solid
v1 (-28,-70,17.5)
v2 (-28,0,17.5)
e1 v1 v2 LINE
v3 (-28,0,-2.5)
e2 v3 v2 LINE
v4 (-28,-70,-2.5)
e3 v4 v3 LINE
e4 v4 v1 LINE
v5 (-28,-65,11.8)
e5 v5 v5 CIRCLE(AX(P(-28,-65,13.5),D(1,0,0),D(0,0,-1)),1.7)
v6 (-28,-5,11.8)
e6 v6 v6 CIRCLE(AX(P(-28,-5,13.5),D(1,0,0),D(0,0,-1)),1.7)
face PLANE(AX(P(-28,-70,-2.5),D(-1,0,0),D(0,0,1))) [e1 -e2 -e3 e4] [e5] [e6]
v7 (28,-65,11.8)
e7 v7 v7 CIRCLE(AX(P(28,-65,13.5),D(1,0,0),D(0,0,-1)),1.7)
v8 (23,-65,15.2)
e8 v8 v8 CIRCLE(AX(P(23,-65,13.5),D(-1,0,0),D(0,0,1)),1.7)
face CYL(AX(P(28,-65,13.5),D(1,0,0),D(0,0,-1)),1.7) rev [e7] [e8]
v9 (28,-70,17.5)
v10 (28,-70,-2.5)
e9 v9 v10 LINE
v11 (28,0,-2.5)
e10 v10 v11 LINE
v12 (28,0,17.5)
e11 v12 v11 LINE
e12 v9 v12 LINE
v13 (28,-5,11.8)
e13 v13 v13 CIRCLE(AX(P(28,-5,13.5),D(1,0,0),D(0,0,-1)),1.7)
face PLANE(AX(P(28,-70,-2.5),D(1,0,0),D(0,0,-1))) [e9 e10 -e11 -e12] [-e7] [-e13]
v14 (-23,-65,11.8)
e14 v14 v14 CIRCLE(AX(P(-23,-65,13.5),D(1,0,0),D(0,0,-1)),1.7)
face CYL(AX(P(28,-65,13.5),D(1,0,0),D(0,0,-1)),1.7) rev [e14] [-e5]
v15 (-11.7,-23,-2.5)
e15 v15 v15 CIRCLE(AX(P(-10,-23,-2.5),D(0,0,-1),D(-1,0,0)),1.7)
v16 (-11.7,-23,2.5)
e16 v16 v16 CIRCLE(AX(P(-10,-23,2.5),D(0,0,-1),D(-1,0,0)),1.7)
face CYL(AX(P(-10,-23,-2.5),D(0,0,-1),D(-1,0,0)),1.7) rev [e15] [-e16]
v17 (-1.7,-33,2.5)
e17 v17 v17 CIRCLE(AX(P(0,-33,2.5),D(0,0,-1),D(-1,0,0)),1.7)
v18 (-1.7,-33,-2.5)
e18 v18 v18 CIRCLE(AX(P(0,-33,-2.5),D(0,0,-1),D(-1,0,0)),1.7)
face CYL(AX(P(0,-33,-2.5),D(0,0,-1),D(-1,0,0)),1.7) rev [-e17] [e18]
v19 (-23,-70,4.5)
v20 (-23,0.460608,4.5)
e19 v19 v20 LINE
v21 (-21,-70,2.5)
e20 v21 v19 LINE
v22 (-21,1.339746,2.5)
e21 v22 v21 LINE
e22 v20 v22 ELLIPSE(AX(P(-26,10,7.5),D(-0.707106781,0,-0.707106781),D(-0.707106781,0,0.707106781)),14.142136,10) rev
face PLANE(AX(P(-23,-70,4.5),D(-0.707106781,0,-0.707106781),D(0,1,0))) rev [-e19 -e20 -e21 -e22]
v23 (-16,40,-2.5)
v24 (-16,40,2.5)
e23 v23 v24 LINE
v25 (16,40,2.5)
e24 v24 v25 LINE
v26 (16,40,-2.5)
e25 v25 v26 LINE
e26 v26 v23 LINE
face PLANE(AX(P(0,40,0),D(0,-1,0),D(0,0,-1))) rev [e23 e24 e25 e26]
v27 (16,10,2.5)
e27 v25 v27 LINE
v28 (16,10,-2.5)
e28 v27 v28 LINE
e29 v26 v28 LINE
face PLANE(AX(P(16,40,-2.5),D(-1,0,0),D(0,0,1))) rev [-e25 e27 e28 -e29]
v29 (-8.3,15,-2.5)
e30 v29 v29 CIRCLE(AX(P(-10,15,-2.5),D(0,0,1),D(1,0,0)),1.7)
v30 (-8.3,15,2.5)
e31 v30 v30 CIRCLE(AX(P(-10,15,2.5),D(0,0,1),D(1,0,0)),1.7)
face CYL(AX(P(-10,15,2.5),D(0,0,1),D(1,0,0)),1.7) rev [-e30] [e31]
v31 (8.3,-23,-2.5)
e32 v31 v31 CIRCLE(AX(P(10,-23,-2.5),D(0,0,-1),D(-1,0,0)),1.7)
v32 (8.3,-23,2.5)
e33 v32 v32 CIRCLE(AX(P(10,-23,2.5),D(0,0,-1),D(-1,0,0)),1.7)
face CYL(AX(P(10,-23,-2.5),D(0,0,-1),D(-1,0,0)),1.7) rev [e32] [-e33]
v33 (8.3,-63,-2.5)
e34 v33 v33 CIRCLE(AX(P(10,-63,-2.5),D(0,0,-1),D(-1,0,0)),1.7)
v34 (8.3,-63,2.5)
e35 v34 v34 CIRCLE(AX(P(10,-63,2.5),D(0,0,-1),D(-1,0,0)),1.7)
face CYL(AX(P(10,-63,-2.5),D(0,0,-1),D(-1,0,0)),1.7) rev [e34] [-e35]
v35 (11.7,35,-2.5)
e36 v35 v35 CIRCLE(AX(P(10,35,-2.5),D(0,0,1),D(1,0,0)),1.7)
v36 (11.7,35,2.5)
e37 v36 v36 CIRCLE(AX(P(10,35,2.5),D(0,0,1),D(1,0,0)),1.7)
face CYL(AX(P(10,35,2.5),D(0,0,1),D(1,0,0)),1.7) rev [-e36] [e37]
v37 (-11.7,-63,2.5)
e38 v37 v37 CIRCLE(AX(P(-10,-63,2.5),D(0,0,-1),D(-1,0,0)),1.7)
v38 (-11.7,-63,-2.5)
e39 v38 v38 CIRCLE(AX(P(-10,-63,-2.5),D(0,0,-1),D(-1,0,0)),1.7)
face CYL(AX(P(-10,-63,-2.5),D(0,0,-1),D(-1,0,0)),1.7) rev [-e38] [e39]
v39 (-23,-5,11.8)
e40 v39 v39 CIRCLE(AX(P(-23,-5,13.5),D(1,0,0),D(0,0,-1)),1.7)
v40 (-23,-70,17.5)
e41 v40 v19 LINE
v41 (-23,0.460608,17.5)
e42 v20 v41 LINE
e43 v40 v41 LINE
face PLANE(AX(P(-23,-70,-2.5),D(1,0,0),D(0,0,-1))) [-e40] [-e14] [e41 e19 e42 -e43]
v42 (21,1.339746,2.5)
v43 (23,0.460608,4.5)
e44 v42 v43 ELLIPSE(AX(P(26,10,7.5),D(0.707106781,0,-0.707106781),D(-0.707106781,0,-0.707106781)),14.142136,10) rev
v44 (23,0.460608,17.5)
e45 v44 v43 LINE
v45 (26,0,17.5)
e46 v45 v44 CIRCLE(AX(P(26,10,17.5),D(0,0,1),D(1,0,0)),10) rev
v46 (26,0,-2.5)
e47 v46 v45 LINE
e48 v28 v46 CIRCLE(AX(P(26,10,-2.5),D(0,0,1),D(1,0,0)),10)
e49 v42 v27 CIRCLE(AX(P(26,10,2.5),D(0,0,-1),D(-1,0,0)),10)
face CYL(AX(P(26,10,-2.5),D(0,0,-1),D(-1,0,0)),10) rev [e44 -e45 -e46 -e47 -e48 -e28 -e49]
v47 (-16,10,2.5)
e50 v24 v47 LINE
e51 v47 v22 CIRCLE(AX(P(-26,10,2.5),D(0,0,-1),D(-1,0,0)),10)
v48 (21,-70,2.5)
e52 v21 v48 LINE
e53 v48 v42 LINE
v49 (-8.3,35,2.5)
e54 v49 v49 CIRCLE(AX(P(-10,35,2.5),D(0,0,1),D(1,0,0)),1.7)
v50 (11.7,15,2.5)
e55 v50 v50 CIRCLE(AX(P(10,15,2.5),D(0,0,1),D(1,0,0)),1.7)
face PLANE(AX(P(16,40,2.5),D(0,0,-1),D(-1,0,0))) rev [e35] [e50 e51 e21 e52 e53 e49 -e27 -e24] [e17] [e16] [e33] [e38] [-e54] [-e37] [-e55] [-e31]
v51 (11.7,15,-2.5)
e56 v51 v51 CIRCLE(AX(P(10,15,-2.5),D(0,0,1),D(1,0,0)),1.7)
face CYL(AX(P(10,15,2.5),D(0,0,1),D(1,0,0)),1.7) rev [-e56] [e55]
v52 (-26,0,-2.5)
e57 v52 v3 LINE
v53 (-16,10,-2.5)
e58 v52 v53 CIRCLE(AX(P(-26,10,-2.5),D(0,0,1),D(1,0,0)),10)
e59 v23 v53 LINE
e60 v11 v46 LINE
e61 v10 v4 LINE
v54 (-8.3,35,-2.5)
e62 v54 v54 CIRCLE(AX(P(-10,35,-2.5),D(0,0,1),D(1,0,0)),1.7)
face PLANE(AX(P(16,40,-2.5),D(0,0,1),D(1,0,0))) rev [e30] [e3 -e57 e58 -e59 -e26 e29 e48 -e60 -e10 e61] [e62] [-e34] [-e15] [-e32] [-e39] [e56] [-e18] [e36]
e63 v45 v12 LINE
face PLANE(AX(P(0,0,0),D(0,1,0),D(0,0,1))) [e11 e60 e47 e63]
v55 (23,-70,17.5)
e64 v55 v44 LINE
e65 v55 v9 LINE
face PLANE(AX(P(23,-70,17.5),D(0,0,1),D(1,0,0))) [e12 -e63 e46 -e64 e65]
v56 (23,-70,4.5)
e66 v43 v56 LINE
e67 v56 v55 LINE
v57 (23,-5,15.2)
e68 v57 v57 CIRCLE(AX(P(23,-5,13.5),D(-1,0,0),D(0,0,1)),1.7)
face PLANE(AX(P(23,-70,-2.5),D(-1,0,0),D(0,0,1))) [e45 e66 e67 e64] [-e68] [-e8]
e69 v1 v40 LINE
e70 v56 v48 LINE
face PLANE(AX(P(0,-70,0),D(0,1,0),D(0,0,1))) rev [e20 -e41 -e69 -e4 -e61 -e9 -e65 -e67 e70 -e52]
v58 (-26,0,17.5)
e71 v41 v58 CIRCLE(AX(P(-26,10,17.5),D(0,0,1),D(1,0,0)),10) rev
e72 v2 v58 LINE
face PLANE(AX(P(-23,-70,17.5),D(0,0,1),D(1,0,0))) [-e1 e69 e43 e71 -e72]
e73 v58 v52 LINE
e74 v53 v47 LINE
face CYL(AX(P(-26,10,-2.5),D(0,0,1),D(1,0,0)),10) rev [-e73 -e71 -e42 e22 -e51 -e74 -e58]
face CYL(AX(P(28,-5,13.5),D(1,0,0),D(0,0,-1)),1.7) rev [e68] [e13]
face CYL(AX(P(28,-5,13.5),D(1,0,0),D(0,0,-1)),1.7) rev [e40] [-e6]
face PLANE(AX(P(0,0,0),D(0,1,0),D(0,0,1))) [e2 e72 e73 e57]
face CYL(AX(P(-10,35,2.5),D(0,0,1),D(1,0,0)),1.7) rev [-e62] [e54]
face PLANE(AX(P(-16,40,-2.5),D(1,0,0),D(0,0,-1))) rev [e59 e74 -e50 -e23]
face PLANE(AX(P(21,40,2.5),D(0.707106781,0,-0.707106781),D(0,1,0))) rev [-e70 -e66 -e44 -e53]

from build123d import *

# Parameters (mm, degrees)
SKETCH1_W            = 32
SKETCH1_H            = 5
BOSS_EXTRUDE1_DEPTH  = 40
M3_CLEARANCE_HOLE3_D = 3.4
SKETCH4_W            = 46
SKETCH4_H            = 5
BOSS_EXTRUDE2_DEPTH  = 70
SKETCH5_W            = 5
SKETCH5_H            = 20
BOSS_EXTRUDE3_DEPTH  = 70
M3_CLEARANCE_HOLE1_D = 3.4
M3_CLEARANCE_HOLE2_D = 3.4
FILLET2_R            = 10
FILLET4_SIZE         = 2


with BuildPart() as part:
    # Sketch1 → Boss-Extrude1 (new body)
    with BuildSketch(Plane(origin=(0, 0, 0), x_dir=(1, 0, 0), z_dir=(0, 1, 0))):
        Rectangle(SKETCH1_W, SKETCH1_H)
    extrude(amount=BOSS_EXTRUDE1_DEPTH)

    # M3 Clearance Hole3 (through all)
    with Locations(Plane.XY.offset(2.5)):
        with Locations((-10, 35), (10, 35), (10, 15), (-10, 15)):
            Hole(M3_CLEARANCE_HOLE3_D / 2)

    # Sketch4 → Boss-Extrude2 (add)
    with BuildSketch(Plane(origin=(0, 0, 0), x_dir=(1, 0, 0), z_dir=(0, 1, 0))):
        Rectangle(SKETCH4_W, SKETCH4_H)
    extrude(amount=-BOSS_EXTRUDE2_DEPTH)

    # Sketch5 → Boss-Extrude3 (add)
    with BuildSketch(Plane(origin=(0, 0, 0), x_dir=(1, 0, 0), z_dir=(0, 1, 0))):
        with Locations((25.5, -7.5)):
            Rectangle(SKETCH5_W, SKETCH5_H)
        with Locations((-25.5, -7.5)):
            Rectangle(SKETCH5_W, SKETCH5_H)
    extrude(amount=-BOSS_EXTRUDE3_DEPTH)

    # M3 Clearance Hole1 (through all)
    with Locations(Plane(origin=(28, 0, 0), x_dir=(0, 0, -1), z_dir=(1, 0, 0))):
        with Locations((-13.5, -5), (-13.5, -65)):
            Hole(M3_CLEARANCE_HOLE1_D / 2)

    # M3 Clearance Hole2 (through all)
    with Locations(Plane(origin=(0, 0, -2.5), x_dir=(-1, 0, 0), z_dir=(0, 0, -1))):
        with Locations((-10, -23), (10, -23), (0, -33), (-10, -63), (10, -63)):
            Hole(M3_CLEARANCE_HOLE2_D / 2)

    # Fillet2
    fillet2_edges = [part.edges().sort_by_distance(p)[0] for p in [
        (-16, 0, 0),
        (16, 0, 0),
    ]]
    fillet(fillet2_edges, radius=FILLET2_R)

    # Fillet4
    fillet4_edges = [part.edges().sort_by_distance(p)[0] for p in [
        (-23, -34.769696007, 2.5),
        (23, -34.769696007, 2.5),
    ]]
    chamfer(fillet4_edges, length=FILLET4_SIZE)


solid = part.part
